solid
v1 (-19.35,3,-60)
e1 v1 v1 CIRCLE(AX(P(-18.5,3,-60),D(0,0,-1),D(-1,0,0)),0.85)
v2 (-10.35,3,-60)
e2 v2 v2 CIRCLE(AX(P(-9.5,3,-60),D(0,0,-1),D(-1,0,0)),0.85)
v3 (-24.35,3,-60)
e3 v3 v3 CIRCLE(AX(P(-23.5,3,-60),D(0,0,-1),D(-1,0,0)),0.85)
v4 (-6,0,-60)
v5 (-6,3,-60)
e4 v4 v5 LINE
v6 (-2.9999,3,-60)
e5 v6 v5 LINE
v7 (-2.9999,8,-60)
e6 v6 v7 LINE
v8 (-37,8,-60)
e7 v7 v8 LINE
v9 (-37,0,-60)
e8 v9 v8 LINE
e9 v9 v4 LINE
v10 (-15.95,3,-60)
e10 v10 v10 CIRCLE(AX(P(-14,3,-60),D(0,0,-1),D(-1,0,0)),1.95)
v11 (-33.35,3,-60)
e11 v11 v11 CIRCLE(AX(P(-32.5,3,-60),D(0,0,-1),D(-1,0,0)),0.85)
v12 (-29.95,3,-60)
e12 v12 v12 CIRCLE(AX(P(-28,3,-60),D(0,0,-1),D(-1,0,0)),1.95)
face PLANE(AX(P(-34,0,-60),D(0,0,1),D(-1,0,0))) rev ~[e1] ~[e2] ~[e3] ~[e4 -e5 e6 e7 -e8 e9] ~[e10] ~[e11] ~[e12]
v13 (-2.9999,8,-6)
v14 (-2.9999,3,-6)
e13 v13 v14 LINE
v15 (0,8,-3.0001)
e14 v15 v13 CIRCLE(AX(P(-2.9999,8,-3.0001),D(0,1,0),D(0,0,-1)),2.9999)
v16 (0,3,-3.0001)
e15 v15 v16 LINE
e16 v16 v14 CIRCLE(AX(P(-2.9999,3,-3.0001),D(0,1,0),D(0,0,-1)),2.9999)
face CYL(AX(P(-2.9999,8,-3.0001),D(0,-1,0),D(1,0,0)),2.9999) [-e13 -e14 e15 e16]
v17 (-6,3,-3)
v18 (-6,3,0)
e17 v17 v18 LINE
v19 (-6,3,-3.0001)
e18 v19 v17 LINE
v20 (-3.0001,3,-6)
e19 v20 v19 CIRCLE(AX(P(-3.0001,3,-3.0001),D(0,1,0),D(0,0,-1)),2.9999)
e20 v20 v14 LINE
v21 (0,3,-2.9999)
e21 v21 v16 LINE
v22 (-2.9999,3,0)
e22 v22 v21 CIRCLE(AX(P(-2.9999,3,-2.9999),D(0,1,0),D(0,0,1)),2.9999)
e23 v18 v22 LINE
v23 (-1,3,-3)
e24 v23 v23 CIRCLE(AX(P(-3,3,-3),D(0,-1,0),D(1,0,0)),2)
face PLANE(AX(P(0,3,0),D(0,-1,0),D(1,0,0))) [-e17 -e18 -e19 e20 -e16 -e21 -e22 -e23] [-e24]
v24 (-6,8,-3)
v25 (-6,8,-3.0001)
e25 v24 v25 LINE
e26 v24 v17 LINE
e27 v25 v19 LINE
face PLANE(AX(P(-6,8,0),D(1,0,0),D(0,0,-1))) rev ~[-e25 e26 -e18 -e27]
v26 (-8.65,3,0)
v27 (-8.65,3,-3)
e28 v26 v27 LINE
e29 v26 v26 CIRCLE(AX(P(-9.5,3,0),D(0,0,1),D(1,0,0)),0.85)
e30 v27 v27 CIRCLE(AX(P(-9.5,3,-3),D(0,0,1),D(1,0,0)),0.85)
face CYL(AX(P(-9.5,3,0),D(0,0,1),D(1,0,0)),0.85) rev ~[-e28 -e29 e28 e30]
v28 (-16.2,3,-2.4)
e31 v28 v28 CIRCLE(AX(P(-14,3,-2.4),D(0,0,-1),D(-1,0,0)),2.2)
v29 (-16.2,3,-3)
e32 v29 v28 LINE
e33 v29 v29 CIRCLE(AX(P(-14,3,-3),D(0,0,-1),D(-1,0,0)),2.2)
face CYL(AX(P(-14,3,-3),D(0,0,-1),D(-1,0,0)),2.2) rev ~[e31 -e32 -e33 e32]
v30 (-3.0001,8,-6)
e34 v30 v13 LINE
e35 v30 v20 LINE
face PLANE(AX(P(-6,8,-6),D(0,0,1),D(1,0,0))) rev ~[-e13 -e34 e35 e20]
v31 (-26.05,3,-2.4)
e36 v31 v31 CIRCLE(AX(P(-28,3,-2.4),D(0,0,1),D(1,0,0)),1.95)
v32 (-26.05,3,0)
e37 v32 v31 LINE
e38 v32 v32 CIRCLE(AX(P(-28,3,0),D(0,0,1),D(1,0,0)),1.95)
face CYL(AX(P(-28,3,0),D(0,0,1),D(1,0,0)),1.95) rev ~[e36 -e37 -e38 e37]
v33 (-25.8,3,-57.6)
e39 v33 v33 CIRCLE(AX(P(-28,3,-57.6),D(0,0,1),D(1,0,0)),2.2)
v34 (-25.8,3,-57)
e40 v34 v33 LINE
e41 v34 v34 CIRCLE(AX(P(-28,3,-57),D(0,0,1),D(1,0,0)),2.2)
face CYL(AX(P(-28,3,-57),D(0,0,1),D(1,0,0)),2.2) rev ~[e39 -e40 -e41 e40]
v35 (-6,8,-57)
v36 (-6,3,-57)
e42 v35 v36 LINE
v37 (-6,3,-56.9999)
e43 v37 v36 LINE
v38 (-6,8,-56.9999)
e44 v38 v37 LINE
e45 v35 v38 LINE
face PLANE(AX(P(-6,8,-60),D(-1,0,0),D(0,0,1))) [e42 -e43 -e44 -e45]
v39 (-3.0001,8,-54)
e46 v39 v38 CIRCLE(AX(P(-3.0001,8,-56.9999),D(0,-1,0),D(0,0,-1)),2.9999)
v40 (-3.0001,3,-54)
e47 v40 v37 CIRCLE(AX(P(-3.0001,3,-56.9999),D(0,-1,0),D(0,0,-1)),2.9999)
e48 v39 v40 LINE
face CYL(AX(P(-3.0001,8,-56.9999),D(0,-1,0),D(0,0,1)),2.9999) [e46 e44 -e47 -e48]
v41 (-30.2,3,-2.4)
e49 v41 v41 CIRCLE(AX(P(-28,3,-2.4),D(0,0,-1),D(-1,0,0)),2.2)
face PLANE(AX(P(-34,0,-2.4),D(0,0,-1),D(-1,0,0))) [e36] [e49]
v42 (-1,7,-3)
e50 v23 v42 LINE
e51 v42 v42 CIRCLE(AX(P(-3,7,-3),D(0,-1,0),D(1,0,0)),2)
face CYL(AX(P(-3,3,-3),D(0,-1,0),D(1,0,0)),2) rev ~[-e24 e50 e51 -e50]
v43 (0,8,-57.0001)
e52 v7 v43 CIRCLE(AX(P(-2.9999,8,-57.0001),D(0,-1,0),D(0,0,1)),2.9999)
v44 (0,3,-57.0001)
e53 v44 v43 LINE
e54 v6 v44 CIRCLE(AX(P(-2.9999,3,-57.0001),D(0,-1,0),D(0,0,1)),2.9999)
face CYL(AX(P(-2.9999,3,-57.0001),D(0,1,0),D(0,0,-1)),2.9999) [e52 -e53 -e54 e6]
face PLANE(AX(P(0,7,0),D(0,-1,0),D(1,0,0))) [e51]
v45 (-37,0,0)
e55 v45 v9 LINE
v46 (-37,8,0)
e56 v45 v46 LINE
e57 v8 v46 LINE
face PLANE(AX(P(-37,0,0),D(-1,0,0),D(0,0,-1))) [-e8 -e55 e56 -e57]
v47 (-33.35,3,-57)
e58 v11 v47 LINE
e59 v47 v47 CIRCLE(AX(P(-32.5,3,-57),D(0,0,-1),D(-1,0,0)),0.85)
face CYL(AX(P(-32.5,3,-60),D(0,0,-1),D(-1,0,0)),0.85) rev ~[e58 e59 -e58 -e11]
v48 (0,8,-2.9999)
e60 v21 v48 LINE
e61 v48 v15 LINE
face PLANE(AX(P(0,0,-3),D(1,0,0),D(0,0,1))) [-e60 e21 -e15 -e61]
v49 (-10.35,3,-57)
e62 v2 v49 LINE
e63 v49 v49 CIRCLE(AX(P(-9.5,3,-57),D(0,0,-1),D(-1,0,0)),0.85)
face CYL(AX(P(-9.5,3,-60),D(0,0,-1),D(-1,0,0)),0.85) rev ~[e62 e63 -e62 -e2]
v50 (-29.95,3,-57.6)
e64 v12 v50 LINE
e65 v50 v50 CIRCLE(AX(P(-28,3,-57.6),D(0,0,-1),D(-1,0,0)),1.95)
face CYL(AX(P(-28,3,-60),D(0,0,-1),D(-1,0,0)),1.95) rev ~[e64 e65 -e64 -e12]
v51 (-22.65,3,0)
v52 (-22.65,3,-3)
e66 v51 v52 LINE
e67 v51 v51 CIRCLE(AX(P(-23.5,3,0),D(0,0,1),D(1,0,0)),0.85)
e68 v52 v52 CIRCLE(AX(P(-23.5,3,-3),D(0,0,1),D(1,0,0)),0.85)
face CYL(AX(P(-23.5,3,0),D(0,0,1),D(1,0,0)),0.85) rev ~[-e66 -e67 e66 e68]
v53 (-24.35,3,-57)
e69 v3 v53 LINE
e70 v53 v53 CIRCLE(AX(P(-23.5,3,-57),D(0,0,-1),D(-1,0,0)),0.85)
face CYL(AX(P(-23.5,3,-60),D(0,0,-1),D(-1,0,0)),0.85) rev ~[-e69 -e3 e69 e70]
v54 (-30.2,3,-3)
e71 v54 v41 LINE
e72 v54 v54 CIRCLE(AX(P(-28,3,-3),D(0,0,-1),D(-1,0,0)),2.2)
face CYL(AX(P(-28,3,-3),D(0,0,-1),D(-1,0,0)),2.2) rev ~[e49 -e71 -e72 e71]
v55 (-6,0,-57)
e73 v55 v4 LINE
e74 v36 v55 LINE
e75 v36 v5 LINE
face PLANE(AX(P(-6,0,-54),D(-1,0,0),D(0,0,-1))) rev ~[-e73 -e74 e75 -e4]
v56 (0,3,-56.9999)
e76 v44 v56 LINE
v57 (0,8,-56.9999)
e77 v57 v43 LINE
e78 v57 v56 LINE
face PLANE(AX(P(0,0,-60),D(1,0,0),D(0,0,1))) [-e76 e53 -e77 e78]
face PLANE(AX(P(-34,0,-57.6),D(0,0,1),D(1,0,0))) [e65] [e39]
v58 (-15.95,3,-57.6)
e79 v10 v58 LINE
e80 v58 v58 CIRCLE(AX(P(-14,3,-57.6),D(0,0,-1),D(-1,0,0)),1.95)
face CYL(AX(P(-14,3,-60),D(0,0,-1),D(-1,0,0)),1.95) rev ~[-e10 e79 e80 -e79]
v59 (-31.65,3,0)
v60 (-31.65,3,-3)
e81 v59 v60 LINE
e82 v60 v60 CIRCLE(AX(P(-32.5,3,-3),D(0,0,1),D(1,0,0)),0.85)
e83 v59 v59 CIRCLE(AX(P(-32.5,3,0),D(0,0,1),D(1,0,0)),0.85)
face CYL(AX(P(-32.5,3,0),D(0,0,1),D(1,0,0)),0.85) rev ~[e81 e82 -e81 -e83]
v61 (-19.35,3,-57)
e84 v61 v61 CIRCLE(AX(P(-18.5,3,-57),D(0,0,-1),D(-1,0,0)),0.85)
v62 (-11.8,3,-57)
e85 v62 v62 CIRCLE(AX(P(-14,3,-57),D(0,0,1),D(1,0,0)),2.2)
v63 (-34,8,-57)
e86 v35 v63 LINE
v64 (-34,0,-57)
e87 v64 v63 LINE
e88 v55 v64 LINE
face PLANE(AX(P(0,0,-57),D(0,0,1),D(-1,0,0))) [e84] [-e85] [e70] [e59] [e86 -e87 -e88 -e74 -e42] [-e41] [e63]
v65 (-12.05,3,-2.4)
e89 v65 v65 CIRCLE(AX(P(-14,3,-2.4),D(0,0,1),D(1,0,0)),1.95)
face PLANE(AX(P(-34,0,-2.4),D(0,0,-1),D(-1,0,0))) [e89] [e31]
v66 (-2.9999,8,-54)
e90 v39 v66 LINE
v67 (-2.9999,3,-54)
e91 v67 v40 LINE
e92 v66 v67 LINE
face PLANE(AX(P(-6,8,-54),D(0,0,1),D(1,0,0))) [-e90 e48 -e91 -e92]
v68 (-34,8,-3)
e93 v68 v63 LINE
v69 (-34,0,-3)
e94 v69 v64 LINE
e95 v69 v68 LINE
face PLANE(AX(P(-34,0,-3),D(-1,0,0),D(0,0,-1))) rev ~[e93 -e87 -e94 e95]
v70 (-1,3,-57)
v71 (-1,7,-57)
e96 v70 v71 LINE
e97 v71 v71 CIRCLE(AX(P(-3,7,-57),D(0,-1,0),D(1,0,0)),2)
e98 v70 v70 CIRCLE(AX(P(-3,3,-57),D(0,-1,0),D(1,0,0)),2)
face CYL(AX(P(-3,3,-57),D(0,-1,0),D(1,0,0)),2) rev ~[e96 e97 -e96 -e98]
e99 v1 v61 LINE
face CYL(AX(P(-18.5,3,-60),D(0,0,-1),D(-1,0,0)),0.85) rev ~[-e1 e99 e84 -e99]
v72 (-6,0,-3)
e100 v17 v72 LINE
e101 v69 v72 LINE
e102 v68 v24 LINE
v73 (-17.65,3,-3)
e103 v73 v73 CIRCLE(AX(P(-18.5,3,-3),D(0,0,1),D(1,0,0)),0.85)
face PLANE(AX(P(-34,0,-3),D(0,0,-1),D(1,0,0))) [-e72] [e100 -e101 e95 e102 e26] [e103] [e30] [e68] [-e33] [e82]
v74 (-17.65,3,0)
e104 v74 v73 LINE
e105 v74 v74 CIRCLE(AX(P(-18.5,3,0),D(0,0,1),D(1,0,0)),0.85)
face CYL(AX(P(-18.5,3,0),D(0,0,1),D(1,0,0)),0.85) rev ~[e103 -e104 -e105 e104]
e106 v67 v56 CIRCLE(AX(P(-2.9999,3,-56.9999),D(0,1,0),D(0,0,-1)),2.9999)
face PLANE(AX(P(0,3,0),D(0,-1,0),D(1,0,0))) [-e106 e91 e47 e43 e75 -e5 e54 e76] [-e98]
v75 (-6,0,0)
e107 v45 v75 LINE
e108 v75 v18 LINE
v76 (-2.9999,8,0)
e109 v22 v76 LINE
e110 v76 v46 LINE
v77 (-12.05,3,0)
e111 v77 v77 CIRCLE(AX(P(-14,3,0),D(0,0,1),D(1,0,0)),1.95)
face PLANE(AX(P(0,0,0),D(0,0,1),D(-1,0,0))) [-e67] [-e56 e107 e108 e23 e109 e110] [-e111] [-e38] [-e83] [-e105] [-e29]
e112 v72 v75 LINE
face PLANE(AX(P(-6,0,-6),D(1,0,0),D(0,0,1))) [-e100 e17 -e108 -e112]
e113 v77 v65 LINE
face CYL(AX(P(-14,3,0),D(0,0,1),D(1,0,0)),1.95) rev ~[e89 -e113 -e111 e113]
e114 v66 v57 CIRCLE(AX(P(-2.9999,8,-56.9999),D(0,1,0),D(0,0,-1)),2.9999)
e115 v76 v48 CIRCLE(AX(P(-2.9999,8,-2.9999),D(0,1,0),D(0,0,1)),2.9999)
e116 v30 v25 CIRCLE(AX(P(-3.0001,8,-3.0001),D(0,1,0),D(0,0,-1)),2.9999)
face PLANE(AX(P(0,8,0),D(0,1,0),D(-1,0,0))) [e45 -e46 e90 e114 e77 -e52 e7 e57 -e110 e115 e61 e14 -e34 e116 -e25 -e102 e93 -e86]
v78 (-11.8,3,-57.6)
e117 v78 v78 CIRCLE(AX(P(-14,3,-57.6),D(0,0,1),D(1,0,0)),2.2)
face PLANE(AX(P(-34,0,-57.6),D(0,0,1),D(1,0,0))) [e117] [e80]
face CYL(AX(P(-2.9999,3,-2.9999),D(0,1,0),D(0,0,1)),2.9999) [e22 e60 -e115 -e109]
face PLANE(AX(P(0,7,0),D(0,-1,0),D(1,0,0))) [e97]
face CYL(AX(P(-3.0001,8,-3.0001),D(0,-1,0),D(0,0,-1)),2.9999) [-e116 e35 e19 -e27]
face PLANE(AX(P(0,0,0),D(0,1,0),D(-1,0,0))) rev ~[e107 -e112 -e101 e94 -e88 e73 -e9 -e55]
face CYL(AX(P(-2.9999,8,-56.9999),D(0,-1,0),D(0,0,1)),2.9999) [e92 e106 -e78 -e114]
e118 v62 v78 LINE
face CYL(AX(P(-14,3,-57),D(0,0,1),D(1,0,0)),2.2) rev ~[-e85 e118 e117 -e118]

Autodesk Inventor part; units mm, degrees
ref_plane "YZ Plane" through (0, 0, 0) normal (1, 0, 0) x (0, 1, 0)
ref_plane "XZ Plane" through (0, 0, 0) normal (0, 1, 0) x (-1, 0, 0)
ref_plane "XY Plane" through (0, 0, 0) normal (0, 0, 1) x (1, 0, 0)
sketch "Szkic1" plane through (0, 0, 0) normal (0, 1, 0) x (-1, 0, 0)
  line L0 (0, 0) -> (37, 0)
  line L1 (37, 0) -> (37, -3)
  line L2 (37, -3) -> (0, -3)
  line L3 (0, -3) -> (0, 0)
  line L4 (37, 0) -> (34, 0)
  line L5 (34, 0) -> (34, -60)
  line L6 (34, -60) -> (37, -60)
  line L7 (37, -60) -> (37, 0)
  line L8 (37, -60) -> (0, -60)
  line L9 (0, -60) -> (0, -57)
  line L10 (0, -57) -> (37, -57)
  line L11 (37, -57) -> (37, -60)
  point P0 (34, -3)
  point P1 (34, -57)
  dimension "d0" = 37
  dimension "d1" = 3
  dimension "d2" = 3
  dimension "d3" = 60
  dimension "d4" = 37
  dimension "d5" = 3
extrude "Wyciągnięcie proste1" add sketch "Szkic1" along normal blind 8
sketch "Szkic2" plane through (-37, 0, 0) normal (0, 0, 1) x (1, 0, 0)
  circle A0 centre (9, 3) radius 1.95
  line L0 (0, 0) -> (37, 0) projected
  line L1 (0, 0) -> (0, 8) projected
  circle A1 centre (4.5, 3) radius 0.85
  circle A2 centre (13.5, 3) radius 0.85
  circle A3 centre (18.5, 3) radius 0.85
  circle A4 centre (27.5, 3) radius 0.85
  circle A5 centre (23, 3) radius 1.95
  dimension "d8" = 3.9
  dimension "d9" = 3
  dimension "d10" = 9
  dimension "d11" = 1.7
  dimension "d12" = 1.7
  dimension "d13" = 1.7
  dimension "d14" = 1.7
  dimension "d15" = 4.5
  dimension "d16" = 3
  dimension "d17" = 13.5
  dimension "d18" = 3
  dimension "d19" = 5
  dimension "d20" = 3
  dimension "d21" = 3.9
  dimension "d22" = 4.5
  dimension "d23" = 3
  dimension "d24" = 4.5
  dimension "d25" = 3
sketch "Szkic3" plane through (0, 0, -60) normal (0, 0, -1) x (-1, 0, 0)
  circle A0 centre (28, 3) radius 1.95 projected
  circle A1 centre (32.5, 3) radius 0.85 projected
  circle A2 centre (23.5, 3) radius 0.85 projected
  circle A3 centre (18.5, 3) radius 0.85 projected
  circle A4 centre (14, 3) radius 1.95 projected
  circle A5 centre (9.5, 3) radius 0.85 projected
  point P0 (0, 0)
extrude "Wyciągnięcie proste2" cut sketch "Szkic3" against normal blind 3
extrude "Wyciągnięcie proste3" cut sketch "Szkic2" against normal blind 3
sketch "Szkic4" plane through (0, 8, 0) normal (0, 1, 0) x (1, 0, 0)
  line L0 (0, 0) -> (0, 3) projected
  line L1 (0, 0) -> (-6, 0)
  line L2 (-6, 0) -> (-6, 6)
  line L3 (-6, 6) -> (0, 6)
  line L4 (0, 6) -> (0, 0)
  line L5 (0, 60) -> (-37, 60) projected
  line L6 (0, 60) -> (-6, 60)
  line L7 (-6, 60) -> (-6, 54)
  line L8 (-6, 54) -> (0, 54)
  line L9 (0, 54) -> (0, 60)
  dimension "d30" = 6
  dimension "d31" = 6
  dimension "d32" = 6
  dimension "d33" = 6
extrude "Wyciągnięcie proste4" add sketch "Szkic4" against normal blind 8
sketch "Szkic5" plane through (0, 0, 0) normal (0, -1, 0) x (1, 0, 0)
  line L0 (-6, -6) -> (0, -6) projected
  line L1 (0, -6) -> (-6, -6)
  line L2 (-6, -6) -> (-6, 0)
  line L3 (-6, 0) -> (0, 0)
  line L4 (0, 0) -> (0, -6)
  line L5 (0, -54) -> (-6, -54) projected
  line L6 (0, -60) -> (-37, -60) projected
  line L7 (0, -54) -> (-6, -54)
  line L8 (-6, -54) -> (-6, -60)
  line L9 (-6, -60) -> (0, -60)
  line L10 (0, -60) -> (0, -54)
extrude "Wyciągnięcie proste5" cut sketch "Szkic5" against normal blind 3
sketch "Szkic6" plane through (0, 3, 0) normal (0, -1, 0) x (1, 0, 0)
  circle A0 centre (-3, -3) radius 2
  circle A1 centre (-3, -57) radius 2
  line L0 (0, 0) -> (0, -6) projected
  line L1 (-6, 0) -> (0, 0) projected
  line L2 (-6, -54) -> (0, -54) projected
  line L3 (0, -54) -> (0, -60) projected
  point P0 (-3, -54)
  dimension "d38" = 4
  dimension "d39" = 4
  dimension "d40" = 3
  dimension "d41" = 3
  dimension "d42" = 3
  dimension "d43" = 3
extrude "Wyciągnięcie proste6" cut sketch "Szkic6" against normal blind 4
sketch "Szkic7" plane through (-34, 0, -3) normal (0, 0, -1) x (-1, 0, 0)
  circle A0 centre (-6, 3) radius 1.95 projected
  circle A1 centre (-6, 3) radius 2.2
  circle A2 centre (-20, 3) radius 1.95 projected
  circle A3 centre (-20, 3) radius 2.2
  point P0 (-34, 0)
  dimension "d46" = 4.4
  dimension "d47" = 4.4
extrude "Wyciągnięcie proste7" cut sketch "Szkic7" against normal blind 0.6 contours A0 | A1 | A2 | A3
sketch "Szkic8" plane through (-34, 0, -57) normal (0, 0, 1) x (1, 0, 0)
  circle A0 centre (20, 3) radius 2.2 projected
  circle A1 centre (20, 3) radius 2.2
  circle A2 centre (6, 3) radius 2.2 projected
  circle A3 centre (6, 3) radius 2.2
  point P0 (34, 0)
  dimension "d50" = 4.4
  dimension "d51" = 4.4
extrude "Wyciągnięcie proste8" cut sketch "Szkic8" against normal blind 0.6
fillet "Fillet1" radius 3 4 edges at (0, 5.5, 0) (0, 5.5, -6) (0, 5.5, -54) (0, 5.5, -60)
fillet "Zaokrąglenie2" radius 3 2 edges at (-6, 5.5, -54) (-6, 5.5, -6)
properties part number "bmw" material "Tworzywo sztuczne PET"
